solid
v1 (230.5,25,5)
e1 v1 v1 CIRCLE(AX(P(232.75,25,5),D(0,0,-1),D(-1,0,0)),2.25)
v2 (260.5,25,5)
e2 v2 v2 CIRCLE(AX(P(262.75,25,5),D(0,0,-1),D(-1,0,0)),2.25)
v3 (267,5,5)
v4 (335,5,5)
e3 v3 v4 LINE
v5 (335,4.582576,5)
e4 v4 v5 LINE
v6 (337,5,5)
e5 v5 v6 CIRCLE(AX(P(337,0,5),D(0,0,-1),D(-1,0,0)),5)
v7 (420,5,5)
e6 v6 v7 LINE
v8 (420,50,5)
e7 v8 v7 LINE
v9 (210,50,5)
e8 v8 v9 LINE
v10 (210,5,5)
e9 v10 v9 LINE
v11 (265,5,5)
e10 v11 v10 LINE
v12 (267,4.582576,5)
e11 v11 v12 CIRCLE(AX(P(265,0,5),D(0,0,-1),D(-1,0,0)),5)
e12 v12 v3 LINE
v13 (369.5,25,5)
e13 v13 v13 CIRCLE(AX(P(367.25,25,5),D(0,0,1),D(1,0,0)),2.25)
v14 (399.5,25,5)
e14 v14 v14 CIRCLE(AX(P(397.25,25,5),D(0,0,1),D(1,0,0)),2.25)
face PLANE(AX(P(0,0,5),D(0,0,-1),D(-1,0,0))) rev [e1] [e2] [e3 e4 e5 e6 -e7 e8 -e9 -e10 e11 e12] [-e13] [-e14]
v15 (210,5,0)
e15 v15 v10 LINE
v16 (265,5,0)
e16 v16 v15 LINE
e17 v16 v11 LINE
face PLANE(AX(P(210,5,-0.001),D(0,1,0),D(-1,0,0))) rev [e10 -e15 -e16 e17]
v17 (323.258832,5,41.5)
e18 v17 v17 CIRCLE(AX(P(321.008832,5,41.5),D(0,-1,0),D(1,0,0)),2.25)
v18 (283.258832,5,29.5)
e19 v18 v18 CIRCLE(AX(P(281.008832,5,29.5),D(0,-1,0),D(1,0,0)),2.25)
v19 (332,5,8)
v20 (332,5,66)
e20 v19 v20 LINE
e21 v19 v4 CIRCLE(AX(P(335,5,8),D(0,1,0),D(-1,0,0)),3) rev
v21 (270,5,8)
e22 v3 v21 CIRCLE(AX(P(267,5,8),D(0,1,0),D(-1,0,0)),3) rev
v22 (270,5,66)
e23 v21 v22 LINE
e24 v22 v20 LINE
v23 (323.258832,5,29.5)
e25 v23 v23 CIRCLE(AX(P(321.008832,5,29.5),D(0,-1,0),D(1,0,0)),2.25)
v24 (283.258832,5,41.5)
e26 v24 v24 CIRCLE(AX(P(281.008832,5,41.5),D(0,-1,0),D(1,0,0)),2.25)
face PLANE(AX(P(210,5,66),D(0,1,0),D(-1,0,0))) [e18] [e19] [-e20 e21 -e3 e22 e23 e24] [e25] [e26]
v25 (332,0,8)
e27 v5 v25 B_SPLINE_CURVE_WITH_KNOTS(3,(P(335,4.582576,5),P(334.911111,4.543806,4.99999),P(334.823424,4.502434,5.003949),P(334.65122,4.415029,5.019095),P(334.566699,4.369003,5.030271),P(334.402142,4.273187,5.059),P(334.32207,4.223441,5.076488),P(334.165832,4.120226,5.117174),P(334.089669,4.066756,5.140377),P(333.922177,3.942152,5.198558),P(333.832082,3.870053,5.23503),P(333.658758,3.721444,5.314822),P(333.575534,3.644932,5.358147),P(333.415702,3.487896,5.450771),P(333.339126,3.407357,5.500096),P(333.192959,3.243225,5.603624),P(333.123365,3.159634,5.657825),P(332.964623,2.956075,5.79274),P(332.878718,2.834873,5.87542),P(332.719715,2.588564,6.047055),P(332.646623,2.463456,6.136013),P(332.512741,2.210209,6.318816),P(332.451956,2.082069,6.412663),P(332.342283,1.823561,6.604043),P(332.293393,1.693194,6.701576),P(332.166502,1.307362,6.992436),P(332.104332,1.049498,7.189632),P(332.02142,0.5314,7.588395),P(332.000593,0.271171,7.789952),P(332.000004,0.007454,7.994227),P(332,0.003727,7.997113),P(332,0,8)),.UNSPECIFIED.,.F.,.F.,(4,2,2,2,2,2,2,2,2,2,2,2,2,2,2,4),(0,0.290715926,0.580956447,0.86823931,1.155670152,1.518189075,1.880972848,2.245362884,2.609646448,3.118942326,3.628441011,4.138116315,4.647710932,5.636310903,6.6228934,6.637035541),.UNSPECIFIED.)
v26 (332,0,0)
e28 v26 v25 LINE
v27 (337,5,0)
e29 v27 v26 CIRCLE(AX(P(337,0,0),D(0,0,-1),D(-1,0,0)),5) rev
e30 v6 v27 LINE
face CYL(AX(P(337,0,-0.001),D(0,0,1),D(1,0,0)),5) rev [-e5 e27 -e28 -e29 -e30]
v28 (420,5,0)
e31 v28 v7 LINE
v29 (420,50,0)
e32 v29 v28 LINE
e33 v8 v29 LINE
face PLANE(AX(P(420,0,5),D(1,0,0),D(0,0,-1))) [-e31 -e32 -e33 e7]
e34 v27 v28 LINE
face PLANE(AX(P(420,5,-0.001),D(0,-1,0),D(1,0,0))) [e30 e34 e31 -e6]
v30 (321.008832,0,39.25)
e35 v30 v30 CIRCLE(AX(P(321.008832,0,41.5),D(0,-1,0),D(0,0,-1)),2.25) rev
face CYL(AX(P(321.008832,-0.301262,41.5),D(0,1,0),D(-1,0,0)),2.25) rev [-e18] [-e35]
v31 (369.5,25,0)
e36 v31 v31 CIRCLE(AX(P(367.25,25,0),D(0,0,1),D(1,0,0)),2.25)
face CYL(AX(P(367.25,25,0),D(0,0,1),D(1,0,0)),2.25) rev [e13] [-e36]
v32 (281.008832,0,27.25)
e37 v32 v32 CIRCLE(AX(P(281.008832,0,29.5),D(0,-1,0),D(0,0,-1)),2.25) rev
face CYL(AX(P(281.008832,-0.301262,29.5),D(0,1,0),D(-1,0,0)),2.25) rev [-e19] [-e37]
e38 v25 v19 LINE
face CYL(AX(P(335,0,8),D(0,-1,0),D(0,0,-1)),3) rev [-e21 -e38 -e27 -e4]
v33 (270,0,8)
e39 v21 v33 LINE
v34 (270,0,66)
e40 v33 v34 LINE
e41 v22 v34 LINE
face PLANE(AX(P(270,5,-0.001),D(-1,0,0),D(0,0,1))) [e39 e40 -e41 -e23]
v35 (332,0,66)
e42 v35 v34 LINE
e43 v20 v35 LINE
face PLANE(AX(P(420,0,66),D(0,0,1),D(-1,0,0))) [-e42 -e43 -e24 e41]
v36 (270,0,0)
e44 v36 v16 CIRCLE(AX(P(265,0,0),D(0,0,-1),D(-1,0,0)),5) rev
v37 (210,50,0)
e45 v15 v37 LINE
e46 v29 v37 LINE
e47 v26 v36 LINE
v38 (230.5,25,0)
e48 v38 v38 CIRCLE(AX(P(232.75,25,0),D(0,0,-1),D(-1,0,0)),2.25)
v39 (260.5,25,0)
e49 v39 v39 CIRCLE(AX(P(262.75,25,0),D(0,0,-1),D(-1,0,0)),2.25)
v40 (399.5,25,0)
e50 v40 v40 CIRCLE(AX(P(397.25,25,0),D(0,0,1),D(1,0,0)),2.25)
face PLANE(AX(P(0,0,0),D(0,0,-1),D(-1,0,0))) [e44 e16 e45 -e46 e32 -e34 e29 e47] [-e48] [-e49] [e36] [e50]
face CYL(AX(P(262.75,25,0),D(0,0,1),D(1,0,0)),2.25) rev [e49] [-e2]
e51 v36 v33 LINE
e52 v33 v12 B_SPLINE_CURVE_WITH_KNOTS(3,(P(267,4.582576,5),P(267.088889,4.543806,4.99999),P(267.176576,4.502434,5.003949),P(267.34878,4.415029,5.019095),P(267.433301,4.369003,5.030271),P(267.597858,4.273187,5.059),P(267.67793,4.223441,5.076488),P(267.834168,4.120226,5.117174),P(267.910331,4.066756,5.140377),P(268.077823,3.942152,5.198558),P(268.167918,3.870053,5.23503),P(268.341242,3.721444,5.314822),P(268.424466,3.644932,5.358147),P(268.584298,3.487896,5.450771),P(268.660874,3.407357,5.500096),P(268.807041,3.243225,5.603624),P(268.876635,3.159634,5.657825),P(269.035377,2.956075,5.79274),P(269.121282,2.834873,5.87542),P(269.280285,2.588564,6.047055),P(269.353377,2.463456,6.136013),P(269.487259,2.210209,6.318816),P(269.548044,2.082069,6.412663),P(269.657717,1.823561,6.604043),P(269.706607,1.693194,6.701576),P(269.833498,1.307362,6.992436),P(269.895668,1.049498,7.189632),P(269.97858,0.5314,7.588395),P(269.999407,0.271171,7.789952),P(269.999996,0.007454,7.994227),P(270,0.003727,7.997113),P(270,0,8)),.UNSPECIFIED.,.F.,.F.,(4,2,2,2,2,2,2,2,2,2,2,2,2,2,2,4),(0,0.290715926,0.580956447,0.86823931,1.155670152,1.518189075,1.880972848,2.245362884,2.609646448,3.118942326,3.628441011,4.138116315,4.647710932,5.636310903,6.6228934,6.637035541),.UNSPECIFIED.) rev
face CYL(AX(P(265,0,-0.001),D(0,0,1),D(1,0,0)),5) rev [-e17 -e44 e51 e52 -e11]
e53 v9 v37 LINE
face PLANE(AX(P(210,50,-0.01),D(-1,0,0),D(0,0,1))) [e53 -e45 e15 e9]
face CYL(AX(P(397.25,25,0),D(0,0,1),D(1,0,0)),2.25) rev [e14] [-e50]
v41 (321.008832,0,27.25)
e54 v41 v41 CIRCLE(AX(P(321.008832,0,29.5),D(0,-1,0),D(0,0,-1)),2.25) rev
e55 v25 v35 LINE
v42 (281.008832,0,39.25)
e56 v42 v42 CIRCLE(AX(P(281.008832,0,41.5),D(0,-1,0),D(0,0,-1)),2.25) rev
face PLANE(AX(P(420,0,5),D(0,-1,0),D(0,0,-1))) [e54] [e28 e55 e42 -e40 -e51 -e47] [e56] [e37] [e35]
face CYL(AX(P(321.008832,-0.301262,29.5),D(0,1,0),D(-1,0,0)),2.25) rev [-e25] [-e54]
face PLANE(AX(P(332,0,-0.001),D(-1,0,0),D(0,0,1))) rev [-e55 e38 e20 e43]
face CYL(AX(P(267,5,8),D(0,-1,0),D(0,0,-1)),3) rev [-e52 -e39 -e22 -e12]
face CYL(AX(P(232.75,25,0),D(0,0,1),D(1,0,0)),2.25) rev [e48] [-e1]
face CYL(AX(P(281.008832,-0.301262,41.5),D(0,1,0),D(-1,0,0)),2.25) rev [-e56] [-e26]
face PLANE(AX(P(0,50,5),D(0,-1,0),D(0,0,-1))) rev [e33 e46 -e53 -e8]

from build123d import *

# Parameters (mm, degrees)
SKETCH_1_W                     = 210
SKETCH_1_H                     = 50
EXTRUDE_1_DEPTH                = 5
SKETCH_3_R                     = 2.25
CUT_EXTRUDE_1_DEPTH            = 5
SKETCH_4_W                     = 210
SKETCH_4_H                     = 5
EXTRUDE_2_DEPTH                = 61
CUT_EXTRUDE_2_REACH            = 227.734
SKETCH_6_W                     = 60
SKETCH_6_H                     = 5
FILLET_1_R                     = 10
CUT_EXTRUDE_3_REACH            = 227.734
SKETCH_7_W                     = 88
SKETCH_7_H                     = 5
FILLET_2_R                     = 10
FILLET_6_R                     = 3
SKETCH_11_R                    = 2.25
CUT_EXTRUDE_4_DEPTH            = 225.67977212
SPLIT_BODIES_2_SURFACE_1_BACK  = 429.084
SPLIT_BODIES_2_SURFACE_1_DEPTH = 858.168
FILLET_8_R                     = 5
FILLET_9_R                     = 3


# Some blends are built 0.0001 mm under size
with BuildPart() as part:
    # 草图1 → 凸台-拉伸1 (new body)
    with BuildSketch(Plane.XY):
        with Locations((105, 25)):
            Rectangle(SKETCH_1_W, SKETCH_1_H)
    extrude_1 = extrude(amount=EXTRUDE_1_DEPTH)

    # 草图3 → 切除-拉伸1 (cut)
    with BuildSketch(Plane.XY.offset(5)):
        with Locations((157.25, 25)):
            Circle(SKETCH_3_R)
        with Locations((187.25, 25)):
            Circle(SKETCH_3_R)
        with Locations(Location((22.75, 25, 0), (0, 0, 180))):
            Circle(SKETCH_3_R)
        with Locations(Location((52.75, 25, 0), (0, 0, 180))):
            Circle(SKETCH_3_R)
    cut_extrude_1 = extrude(amount=-CUT_EXTRUDE_1_DEPTH, mode=Mode.SUBTRACT)

    # 草图4 → 凸台-拉伸2 (add)
    with BuildSketch(Plane.XY.offset(5)):
        with Locations((105, 2.5)):
            Rectangle(SKETCH_4_W, SKETCH_4_H)
    extrude_2 = extrude(amount=EXTRUDE_2_DEPTH)

    # 草图6 → 切除-拉伸2 (cut, up to next)
    with BuildSketch(Plane.XY.offset(66), mode=Mode.PRIVATE) as cut_extrude_2_sk1:
        with Locations((180, 2.5)):
            Rectangle(SKETCH_6_W, SKETCH_6_H)
    cut_extrude_2_tool1 = extrude(cut_extrude_2_sk1.sketch, amount=-CUT_EXTRUDE_2_REACH, mode=Mode.PRIVATE) & part.part
    cut_extrude_2 = cut_extrude_2_tool1.solids().sort_by_distance((180, 2.5, 66))[0]
    add(cut_extrude_2, mode=Mode.SUBTRACT)

    # 圆角1
    # the kernel refuses this fillet: 10 mm, written as the material it adds along each edge
    with BuildSketch(Plane(origin=(150, 5, 0), x_dir=(0, -1, 0), z_dir=(0, 0, 1))) as fillet_1_piece_1:
        with BuildLine():
            CenterArc((10, 8.660254038), FILLET_1_R, 180, 60)
            Line((0, 8.660254038), (0, 0))
            Line((0, 0), (5, 0))
        make_face()
    extrude(amount=5)

    # 草图7 → 切除-拉伸3 (cut, up to next)
    with BuildSketch(Plane.XY.offset(66), mode=Mode.PRIVATE) as cut_extrude_3_sk1:
        with Locations((44, 2.5)):
            Rectangle(SKETCH_7_W, SKETCH_7_H)
    cut_extrude_3_tool1 = extrude(cut_extrude_3_sk1.sketch, amount=-CUT_EXTRUDE_3_REACH, mode=Mode.PRIVATE) & part.part
    cut_extrude_3 = cut_extrude_3_tool1.solids().sort_by_distance((44, 2.5, 66))[0]
    add(cut_extrude_3, mode=Mode.SUBTRACT)

    # 圆角2
    # the kernel refuses this fillet: 10 mm, written as the material it adds along each edge
    with BuildSketch(Plane(origin=(88, 5, 0), x_dir=(0, -1, 0), z_dir=(0, 0, 1))) as fillet_2_piece_1:
        with BuildLine():
            CenterArc((10, -8.660254038), FILLET_2_R, 120, 60)
            Line((0, -8.660254038), (0, 0))
            Line((0, 0), (5, 0))
        make_face()
    extrude(amount=5)

    # 圆角6
    # the kernel refuses this fillet: 3 mm, written as the material it adds along each edge
    with BuildSketch(Plane(origin=(150, 5, 5), x_dir=(1, 0, 0), z_dir=(0, -1, 0))) as fillet_6_piece_1_section:
        with BuildLine():
            CenterArc((FILLET_6_R, FILLET_6_R), FILLET_6_R, 180, 90)
            Line((0, FILLET_6_R), (0, 0))
            Line((0, 0), (FILLET_6_R, 0))
        make_face()
    fillet_6_piece_1 = extrude(amount=5, mode=Mode.PRIVATE)
    fillet_6_piece_1 = fillet_6_piece_1 - Plane(origin=(158.660254038, -5, 5.756133445), x_dir=(0, -1, 0), z_dir=(0, 0, -1)) * Cylinder(10, 22, mode=Mode.PRIVATE)
    add(fillet_6_piece_1)
    with BuildSketch(Plane(origin=(88, 5, 5), x_dir=(-1, 0, 0), z_dir=(0, -1, 0))) as fillet_6_piece_2_section:
        with BuildLine():
            CenterArc((FILLET_6_R, -FILLET_6_R), FILLET_6_R, 90, 90)
            Line((0, -FILLET_6_R), (0, 0))
            Line((0, 0), (FILLET_6_R, 0))
        make_face()
    fillet_6_piece_2 = extrude(amount=5, mode=Mode.PRIVATE)
    fillet_6_piece_2 = fillet_6_piece_2 - Plane(origin=(79.339745962, -5, 5.756136784), x_dir=(0, -1, 0), z_dir=(0, 0, -1)) * Cylinder(10, 22, mode=Mode.PRIVATE)
    add(fillet_6_piece_2)

    # 草图11 → 切除-拉伸4 (cut, through all)
    with BuildSketch(Plane(origin=(0, 5, 0), x_dir=(1, 0, 0), z_dir=(0, 1, 0))):
        with Locations(Location((98.991167509, -29.5, 0), (0, 0, 180))):
            Circle(SKETCH_11_R)
        with Locations(Location((138.991167509, -29.5, 0), (0, 0, 180))):
            Circle(SKETCH_11_R)
        with Locations(Location((98.991167509, -41.5, 0), (0, 0, 180))):
            Circle(SKETCH_11_R)
        with Locations(Location((138.991167509, -41.5, 0), (0, 0, 180))):
            Circle(SKETCH_11_R)
    cut_extrude_4 = extrude(amount=-CUT_EXTRUDE_4_DEPTH, mode=Mode.SUBTRACT)

    # 镜向16: 凸台-拉伸1, 切除-拉伸1, 凸台-拉伸2, 切除-拉伸2, 切除-拉伸3, 切除-拉伸4 across plane
    add(extrude_1.mirror(Plane(origin=(210, 0, 5), x_dir=(0, 0, 1), z_dir=(-1, 0, 0))))
    add(cut_extrude_1.mirror(Plane(origin=(210, 0, 5), x_dir=(0, 0, 1), z_dir=(-1, 0, 0))), mode=Mode.SUBTRACT)
    add(extrude_2.mirror(Plane(origin=(210, 0, 5), x_dir=(0, 0, 1), z_dir=(-1, 0, 0))))
    add(cut_extrude_2.mirror(Plane(origin=(210, 0, 5), x_dir=(0, 0, 1), z_dir=(-1, 0, 0))), mode=Mode.SUBTRACT)
    add(cut_extrude_3.mirror(Plane(origin=(210, 0, 5), x_dir=(0, 0, 1), z_dir=(-1, 0, 0))), mode=Mode.SUBTRACT)
    add(cut_extrude_4.mirror(Plane(origin=(210, 0, 5), x_dir=(0, 0, 1), z_dir=(-1, 0, 0))), mode=Mode.SUBTRACT)

    # Split Bodies 2: cut with a surface, the side it looks to stays
    # Split Bodies 2 surface: a surface, the sketch's curves swept straight by 858.168 mm
    with BuildLine(Plane.XY.offset(5).offset(-SPLIT_BODIES_2_SURFACE_1_BACK), mode=Mode.PRIVATE) as split_bodies_2_surface_1_path:
        Line((210, 50), (210, 0))
    split_bodies_2_surface_1 = Shell.extrude(split_bodies_2_surface_1_path.wire(), (0 * SPLIT_BODIES_2_SURFACE_1_DEPTH, 0 * SPLIT_BODIES_2_SURFACE_1_DEPTH, 1 * SPLIT_BODIES_2_SURFACE_1_DEPTH))
    split(bisect_by=split_bodies_2_surface_1, keep=Keep.TOP)

    # 圆角8
    fillet_8_edges = [part.edges().sort_by_distance(p)[0] for p in [
        (332, 5, 2.5),
        (270, 5, 2.5),
    ]]
    fillet(fillet_8_edges, radius=FILLET_8_R - 0.0001)  # a hair under: the kernel refuses the full size

    # 圆角9
    fillet_9_edges = [part.edges().sort_by_distance(p)[0] for p in [
        (332, 2.50005, 5),
        (270, 2.50005, 5),
    ]]
    fillet(fillet_9_edges, radius=FILLET_9_R)


solid = part.part
